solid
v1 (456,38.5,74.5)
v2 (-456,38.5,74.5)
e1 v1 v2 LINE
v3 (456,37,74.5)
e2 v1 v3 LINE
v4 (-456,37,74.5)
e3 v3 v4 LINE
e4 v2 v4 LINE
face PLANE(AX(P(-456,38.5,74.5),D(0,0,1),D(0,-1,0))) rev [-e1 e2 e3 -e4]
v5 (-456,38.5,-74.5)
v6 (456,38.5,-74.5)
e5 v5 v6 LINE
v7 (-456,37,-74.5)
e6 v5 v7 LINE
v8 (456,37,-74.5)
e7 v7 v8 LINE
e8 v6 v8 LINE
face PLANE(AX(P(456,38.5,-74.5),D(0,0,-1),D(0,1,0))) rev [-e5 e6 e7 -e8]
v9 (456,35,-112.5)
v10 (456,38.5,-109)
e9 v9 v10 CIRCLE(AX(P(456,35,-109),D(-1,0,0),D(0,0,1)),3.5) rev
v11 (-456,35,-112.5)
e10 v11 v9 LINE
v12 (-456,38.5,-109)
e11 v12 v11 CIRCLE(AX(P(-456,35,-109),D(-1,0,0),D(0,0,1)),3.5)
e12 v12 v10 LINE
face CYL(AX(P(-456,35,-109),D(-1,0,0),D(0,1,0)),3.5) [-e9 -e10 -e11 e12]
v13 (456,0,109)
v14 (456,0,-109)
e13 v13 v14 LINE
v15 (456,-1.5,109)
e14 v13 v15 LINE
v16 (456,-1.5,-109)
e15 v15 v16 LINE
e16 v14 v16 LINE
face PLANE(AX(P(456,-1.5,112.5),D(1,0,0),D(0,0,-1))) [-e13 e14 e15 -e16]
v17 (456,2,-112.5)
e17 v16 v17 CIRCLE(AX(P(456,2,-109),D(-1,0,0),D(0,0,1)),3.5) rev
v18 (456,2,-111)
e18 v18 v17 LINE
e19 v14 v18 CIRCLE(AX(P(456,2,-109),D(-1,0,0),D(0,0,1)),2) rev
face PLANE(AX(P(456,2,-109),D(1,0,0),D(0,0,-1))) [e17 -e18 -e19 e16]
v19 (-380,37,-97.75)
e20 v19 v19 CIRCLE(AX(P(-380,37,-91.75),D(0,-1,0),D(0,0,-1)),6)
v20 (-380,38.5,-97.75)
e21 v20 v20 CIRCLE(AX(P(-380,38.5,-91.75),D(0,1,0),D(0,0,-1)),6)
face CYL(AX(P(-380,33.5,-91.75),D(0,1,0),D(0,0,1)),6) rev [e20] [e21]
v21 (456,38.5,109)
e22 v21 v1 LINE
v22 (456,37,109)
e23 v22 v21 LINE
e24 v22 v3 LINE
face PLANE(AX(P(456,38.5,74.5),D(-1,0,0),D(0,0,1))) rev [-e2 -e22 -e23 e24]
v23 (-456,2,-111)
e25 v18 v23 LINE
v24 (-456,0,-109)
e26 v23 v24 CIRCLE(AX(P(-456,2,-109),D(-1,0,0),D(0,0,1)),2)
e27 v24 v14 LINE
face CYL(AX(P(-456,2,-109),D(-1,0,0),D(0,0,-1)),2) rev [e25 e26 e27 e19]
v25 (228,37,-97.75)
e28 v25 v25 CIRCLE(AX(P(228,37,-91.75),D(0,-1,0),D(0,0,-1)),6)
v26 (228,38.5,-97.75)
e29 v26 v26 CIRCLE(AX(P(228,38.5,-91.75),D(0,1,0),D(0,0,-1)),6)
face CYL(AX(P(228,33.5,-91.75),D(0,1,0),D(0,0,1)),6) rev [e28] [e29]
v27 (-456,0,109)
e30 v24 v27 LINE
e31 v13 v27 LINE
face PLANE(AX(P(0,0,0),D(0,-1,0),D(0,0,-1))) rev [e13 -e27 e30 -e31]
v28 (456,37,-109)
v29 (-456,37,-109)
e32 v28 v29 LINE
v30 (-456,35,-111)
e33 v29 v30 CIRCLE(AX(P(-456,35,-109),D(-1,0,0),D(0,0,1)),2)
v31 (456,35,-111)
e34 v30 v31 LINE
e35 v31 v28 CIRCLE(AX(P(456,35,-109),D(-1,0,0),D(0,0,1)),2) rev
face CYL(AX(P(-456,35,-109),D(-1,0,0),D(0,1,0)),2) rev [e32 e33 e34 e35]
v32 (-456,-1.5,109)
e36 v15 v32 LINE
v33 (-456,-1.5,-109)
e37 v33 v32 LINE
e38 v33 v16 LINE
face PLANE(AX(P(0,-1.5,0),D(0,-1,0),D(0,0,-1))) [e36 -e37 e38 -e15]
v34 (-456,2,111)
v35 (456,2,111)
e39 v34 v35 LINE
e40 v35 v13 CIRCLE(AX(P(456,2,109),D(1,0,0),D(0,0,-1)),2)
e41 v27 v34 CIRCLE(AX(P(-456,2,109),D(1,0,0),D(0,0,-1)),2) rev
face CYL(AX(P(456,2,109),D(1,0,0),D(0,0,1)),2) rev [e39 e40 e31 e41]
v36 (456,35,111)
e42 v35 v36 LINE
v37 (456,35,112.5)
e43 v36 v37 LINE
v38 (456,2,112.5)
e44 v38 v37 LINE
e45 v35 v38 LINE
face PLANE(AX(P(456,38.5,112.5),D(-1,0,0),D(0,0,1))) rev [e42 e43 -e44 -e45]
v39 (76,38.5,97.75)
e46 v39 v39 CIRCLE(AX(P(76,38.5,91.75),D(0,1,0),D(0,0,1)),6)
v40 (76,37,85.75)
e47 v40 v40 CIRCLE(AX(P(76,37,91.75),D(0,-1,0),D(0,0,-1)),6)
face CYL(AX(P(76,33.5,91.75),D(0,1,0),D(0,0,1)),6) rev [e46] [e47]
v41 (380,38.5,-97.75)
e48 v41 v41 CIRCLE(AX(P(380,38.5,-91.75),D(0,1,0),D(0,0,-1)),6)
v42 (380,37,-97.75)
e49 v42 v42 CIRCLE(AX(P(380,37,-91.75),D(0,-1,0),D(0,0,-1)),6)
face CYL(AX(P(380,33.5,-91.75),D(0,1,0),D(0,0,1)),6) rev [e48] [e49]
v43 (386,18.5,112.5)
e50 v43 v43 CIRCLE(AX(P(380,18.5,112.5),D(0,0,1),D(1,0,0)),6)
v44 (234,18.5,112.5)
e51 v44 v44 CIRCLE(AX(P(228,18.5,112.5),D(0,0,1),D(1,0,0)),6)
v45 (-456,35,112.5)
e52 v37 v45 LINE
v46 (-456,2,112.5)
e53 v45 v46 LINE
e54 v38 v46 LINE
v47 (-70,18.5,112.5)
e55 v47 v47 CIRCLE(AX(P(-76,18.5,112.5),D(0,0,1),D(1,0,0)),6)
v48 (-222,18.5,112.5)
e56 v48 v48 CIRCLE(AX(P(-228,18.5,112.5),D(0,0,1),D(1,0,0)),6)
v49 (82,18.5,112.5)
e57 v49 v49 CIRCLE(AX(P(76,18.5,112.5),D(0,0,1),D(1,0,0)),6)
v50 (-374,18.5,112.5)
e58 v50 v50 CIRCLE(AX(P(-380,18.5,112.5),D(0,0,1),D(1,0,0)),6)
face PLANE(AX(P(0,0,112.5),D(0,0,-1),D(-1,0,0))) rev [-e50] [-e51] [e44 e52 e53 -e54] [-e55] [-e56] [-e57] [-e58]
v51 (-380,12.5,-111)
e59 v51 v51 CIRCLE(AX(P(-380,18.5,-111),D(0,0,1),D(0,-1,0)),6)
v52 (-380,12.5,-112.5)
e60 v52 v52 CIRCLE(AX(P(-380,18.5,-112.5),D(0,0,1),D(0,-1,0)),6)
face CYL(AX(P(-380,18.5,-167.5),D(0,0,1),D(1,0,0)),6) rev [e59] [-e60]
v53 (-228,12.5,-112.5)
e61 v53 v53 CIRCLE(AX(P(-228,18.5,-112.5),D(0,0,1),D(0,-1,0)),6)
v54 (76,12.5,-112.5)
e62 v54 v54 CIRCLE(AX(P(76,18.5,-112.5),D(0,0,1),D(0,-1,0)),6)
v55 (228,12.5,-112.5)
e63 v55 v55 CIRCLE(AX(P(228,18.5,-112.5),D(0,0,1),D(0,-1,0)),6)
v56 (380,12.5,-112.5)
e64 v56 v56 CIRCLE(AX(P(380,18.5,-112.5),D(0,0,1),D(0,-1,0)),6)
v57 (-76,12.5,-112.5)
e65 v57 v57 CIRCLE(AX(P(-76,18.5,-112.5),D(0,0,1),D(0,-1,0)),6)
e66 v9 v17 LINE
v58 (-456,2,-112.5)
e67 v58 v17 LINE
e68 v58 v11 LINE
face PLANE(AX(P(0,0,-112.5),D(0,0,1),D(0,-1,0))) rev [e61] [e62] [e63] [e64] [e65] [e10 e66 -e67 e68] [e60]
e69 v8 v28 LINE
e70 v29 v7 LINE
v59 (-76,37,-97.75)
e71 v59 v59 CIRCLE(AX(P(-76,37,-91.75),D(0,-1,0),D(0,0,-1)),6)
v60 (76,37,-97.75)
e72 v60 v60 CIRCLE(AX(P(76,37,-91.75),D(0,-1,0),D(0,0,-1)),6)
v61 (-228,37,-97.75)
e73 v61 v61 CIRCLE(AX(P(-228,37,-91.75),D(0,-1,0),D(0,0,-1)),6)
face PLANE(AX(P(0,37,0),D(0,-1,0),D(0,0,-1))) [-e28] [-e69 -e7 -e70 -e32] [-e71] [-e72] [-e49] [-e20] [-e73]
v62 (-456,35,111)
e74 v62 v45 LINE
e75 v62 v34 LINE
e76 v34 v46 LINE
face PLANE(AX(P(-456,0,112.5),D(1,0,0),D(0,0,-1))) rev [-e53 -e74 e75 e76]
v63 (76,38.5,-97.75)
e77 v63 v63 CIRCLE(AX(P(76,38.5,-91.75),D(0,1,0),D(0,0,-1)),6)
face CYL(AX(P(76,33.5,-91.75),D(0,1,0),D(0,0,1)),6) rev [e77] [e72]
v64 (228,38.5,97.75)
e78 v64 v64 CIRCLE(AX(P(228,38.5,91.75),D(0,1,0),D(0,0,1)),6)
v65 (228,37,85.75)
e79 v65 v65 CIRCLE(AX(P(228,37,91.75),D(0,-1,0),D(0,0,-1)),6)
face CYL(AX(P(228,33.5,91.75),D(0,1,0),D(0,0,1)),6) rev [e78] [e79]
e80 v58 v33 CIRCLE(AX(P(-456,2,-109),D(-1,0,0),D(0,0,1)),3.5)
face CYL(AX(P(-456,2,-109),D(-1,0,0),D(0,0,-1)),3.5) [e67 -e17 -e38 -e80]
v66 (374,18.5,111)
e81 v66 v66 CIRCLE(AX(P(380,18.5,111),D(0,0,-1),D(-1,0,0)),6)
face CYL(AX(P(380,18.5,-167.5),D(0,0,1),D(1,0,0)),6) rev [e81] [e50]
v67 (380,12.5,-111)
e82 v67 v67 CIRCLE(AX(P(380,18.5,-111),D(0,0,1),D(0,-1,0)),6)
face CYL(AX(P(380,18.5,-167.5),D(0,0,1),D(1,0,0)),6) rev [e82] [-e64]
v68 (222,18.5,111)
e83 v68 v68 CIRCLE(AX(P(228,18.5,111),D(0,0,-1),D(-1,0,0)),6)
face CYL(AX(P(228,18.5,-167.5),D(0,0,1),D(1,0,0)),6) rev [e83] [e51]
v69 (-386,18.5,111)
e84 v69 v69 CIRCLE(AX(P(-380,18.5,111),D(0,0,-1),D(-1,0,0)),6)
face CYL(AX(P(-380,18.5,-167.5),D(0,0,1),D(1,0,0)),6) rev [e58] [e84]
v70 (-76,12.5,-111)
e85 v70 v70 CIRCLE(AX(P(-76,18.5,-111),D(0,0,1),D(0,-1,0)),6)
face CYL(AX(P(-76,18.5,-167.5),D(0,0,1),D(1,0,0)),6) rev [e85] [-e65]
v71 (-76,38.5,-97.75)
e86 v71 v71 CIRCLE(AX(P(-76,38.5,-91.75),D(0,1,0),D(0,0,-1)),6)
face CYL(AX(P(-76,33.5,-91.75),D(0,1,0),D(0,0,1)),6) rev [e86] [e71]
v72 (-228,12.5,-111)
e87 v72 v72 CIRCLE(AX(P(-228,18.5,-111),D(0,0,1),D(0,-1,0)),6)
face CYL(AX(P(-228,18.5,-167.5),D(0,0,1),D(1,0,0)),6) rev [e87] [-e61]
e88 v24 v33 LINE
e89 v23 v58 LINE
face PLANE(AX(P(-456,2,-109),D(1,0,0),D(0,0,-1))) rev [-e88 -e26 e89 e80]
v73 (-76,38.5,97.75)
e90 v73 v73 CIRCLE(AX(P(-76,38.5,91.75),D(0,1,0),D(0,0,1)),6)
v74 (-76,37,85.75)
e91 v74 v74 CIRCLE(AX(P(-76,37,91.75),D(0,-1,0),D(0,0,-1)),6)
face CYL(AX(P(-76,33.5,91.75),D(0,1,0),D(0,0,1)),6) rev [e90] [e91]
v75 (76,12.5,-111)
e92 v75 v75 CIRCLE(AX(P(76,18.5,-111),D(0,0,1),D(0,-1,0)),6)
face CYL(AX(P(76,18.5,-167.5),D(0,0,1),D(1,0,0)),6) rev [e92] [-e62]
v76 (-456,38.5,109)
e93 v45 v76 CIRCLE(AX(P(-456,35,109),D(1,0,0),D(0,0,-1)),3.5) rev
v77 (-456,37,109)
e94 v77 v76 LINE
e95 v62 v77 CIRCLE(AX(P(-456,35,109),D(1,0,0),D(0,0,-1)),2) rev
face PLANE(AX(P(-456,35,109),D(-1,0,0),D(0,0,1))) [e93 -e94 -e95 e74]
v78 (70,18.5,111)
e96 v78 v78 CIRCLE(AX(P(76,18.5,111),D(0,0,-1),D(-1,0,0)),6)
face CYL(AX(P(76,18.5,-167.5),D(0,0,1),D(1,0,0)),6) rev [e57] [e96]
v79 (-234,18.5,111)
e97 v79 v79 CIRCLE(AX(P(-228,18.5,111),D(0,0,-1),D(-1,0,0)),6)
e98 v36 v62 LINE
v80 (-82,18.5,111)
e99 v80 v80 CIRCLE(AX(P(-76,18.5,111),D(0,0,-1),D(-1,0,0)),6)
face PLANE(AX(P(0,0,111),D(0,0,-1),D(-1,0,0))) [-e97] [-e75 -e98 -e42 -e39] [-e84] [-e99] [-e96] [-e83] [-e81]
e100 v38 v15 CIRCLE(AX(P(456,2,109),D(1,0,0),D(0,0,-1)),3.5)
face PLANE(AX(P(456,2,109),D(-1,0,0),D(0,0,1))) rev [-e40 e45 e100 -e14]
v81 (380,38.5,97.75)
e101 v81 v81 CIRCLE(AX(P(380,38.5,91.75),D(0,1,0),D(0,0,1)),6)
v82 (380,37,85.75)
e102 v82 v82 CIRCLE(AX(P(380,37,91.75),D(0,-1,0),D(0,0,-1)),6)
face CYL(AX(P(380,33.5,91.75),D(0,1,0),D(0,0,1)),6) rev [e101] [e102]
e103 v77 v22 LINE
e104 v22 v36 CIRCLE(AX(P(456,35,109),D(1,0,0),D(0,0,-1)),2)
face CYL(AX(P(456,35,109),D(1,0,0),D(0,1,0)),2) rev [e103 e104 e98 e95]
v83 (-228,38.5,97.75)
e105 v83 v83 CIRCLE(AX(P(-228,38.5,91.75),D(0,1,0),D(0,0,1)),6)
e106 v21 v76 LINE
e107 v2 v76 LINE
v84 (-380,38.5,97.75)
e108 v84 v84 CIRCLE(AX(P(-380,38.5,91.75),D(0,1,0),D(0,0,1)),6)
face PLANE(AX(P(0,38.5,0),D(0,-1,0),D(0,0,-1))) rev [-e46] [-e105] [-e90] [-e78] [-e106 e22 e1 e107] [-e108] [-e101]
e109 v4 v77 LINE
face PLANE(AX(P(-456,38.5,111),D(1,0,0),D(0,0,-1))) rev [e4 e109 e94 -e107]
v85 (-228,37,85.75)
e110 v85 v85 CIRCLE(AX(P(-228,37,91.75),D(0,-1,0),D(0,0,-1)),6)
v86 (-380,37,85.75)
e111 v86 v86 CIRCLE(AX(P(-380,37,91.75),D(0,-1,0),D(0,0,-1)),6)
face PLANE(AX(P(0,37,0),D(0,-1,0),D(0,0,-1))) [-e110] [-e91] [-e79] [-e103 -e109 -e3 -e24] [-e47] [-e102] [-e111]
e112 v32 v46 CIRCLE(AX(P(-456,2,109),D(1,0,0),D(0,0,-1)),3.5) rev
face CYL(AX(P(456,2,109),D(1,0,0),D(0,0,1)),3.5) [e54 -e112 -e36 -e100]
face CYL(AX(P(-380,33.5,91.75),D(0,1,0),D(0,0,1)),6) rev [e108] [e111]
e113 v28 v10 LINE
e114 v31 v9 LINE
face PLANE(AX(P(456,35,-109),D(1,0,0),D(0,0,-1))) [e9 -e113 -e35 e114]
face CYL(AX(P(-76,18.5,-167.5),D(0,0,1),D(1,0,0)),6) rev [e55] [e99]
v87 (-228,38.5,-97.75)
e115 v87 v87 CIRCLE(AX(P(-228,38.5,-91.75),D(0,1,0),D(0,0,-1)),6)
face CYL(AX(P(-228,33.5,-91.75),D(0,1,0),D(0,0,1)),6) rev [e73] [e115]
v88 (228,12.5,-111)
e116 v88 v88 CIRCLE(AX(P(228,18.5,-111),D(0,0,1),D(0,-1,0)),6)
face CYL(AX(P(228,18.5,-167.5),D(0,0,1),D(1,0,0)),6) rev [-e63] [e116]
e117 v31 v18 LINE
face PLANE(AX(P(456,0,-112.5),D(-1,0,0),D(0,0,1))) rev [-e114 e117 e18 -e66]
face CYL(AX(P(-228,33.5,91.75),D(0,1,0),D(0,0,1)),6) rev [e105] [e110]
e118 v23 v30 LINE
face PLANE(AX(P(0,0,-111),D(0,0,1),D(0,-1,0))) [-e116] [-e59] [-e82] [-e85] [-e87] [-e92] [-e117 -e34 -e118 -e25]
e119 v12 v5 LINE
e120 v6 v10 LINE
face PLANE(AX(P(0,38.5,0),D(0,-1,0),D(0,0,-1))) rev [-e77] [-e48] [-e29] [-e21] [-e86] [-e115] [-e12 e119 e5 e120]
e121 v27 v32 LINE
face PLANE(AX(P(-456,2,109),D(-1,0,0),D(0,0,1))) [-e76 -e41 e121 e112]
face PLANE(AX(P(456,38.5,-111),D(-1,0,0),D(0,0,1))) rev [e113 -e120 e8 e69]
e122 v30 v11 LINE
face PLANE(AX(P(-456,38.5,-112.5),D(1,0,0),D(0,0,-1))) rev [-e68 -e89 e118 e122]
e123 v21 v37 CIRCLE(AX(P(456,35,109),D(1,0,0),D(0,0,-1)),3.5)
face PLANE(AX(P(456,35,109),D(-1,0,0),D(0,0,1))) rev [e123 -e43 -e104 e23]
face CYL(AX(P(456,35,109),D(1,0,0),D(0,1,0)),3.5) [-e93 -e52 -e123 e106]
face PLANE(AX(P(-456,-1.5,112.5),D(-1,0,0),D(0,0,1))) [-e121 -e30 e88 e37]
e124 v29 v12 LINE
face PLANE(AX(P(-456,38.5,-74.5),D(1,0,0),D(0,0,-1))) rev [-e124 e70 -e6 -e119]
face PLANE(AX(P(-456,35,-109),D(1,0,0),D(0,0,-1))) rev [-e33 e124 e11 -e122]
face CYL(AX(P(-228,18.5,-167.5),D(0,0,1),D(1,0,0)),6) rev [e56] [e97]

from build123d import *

# Parameters (mm, degrees)
SKETCH1_W                      = 912
SKETCH1_H                      = 225
BASE_FLANGE1_DEPTH             = 1.5
EDGE_FLANGE1_STRIP_W           = 10
EDGE_FLANGE1_STRIP_H           = 1.5
EDGE_FLANGE1_STRIP_CUT_DEPTH   = 912
EDGE_FLANGE1_STRIP_2_W         = 10
EDGE_FLANGE1_STRIP_2_H         = 1.5
EDGE_FLANGE1_STRIP_CUT_2_DEPTH = 912
EDGE_FLANGE1_DEPTH             = 912
EDGE_FLANGE1_BEND_DEPTH        = 912
EDGE_FLANGE2_STRIP_W           = 10
EDGE_FLANGE2_STRIP_H           = 1.5
EDGE_FLANGE2_STRIP_CUT_DEPTH   = 912
EDGE_FLANGE2_STRIP_2_W         = 10
EDGE_FLANGE2_STRIP_2_H         = 1.5
EDGE_FLANGE2_STRIP_CUT_2_DEPTH = 912
EDGE_FLANGE2_DEPTH             = 912
EDGE_FLANGE2_BEND_DEPTH        = 912
SKETCH18_R                     = 6
CUT_EXTRUDE1_DEPTH             = 280
SKETCH19_R                     = 6
CUT_EXTRUDE2_DEPTH             = 5


# Sheet-metal steps are written as plain solids
with BuildPart() as part:
    # Sketch1 → Base-Flange1 (new body)
    with BuildSketch(Plane(origin=(0, 0, 0), x_dir=(1, 0, 0), z_dir=(0, 1, 0))):
        Rectangle(SKETCH1_W, SKETCH1_H)
    extrude(amount=-BASE_FLANGE1_DEPTH)

    # Edge-Flange1 strip (across the edge) → Edge-Flange1 strip cut (cut)
    with BuildSketch(Plane(origin=(-456, 0, 112.5), x_dir=(0, 0, -1), z_dir=(1, 0, 0))):
        with Locations((-1.5, -0.75)):
            Rectangle(EDGE_FLANGE1_STRIP_W, EDGE_FLANGE1_STRIP_H)
    extrude(amount=EDGE_FLANGE1_STRIP_CUT_DEPTH, mode=Mode.SUBTRACT)

    # Edge-Flange1 strip 2 (across the edge) → Edge-Flange1 strip cut 2 (cut)
    with BuildSketch(Plane(origin=(456, 0, -112.5), x_dir=(0, 0, 1), z_dir=(-1, 0, 0))):
        with Locations((-1.5, -0.75)):
            Rectangle(EDGE_FLANGE1_STRIP_2_W, EDGE_FLANGE1_STRIP_2_H)
    extrude(amount=EDGE_FLANGE1_STRIP_CUT_2_DEPTH, mode=Mode.SUBTRACT)

    # Edge-Flange1 section (across the edge) → Edge-Flange1 (add)
    with BuildSketch(Plane(origin=(-456, 0, 112.5), x_dir=(0, 0, -1), z_dir=(1, 0, 0))):
        with BuildLine():
            Line((0, 2), (0, 38.5))
            Line((0, 38.5), (1.5, 38.5))
            Line((1.5, 38.5), (1.5, 2))
            ThreePointArc((1.5, 2), (2.085786438, 0.585786438), (3.5, 0))
            Line((3.5, 0), (3.5, -1.5))
            ThreePointArc((3.5, -1.5), (1.025126266, -0.474873734), (0, 2))
        make_face()
    extrude(amount=EDGE_FLANGE1_DEPTH)

    # Edge-Flange1 section 2 (across the edge) → Edge-Flange1 bend (add)
    with BuildSketch(Plane(origin=(456, 0, -112.5), x_dir=(0, 0, 1), z_dir=(-1, 0, 0))):
        with BuildLine():
            Line((0, 2), (0, 38.5))
            Line((0, 38.5), (1.5, 38.5))
            Line((1.5, 38.5), (1.5, 2))
            ThreePointArc((1.5, 2), (2.085786438, 0.585786438), (3.5, 0))
            Line((3.5, 0), (3.5, -1.5))
            ThreePointArc((3.5, -1.5), (1.025126266, -0.474873734), (0, 2))
        make_face()
    extrude(amount=EDGE_FLANGE1_BEND_DEPTH)

    # Edge-Flange2 strip (across the edge) → Edge-Flange2 strip cut (cut)
    with BuildSketch(Plane(origin=(-456, 38.5, 111), x_dir=(0, -1, 0), z_dir=(1, 0, 0))):
        with Locations((-1.5, -0.75)):
            Rectangle(EDGE_FLANGE2_STRIP_W, EDGE_FLANGE2_STRIP_H)
    extrude(amount=EDGE_FLANGE2_STRIP_CUT_DEPTH, mode=Mode.SUBTRACT)

    # Edge-Flange2 strip 2 (across the edge) → Edge-Flange2 strip cut 2 (cut)
    with BuildSketch(Plane(origin=(456, 38.5, -111), x_dir=(0, -1, 0), z_dir=(-1, 0, 0))):
        with Locations((-1.5, -0.75)):
            Rectangle(EDGE_FLANGE2_STRIP_2_W, EDGE_FLANGE2_STRIP_2_H)
    extrude(amount=EDGE_FLANGE2_STRIP_CUT_2_DEPTH, mode=Mode.SUBTRACT)

    # Edge-Flange2 section (across the edge) → Edge-Flange2 (add)
    with BuildSketch(Plane(origin=(-456, 38.5, 111), x_dir=(0, -1, 0), z_dir=(1, 0, 0))):
        with BuildLine():
            Line((0, 2), (0, 36.5))
            Line((0, 36.5), (1.5, 36.5))
            Line((1.5, 36.5), (1.5, 2))
            ThreePointArc((1.5, 2), (2.085786438, 0.585786438), (3.5, 0))
            Line((3.5, 0), (3.5, -1.5))
            ThreePointArc((3.5, -1.5), (1.025126266, -0.474873734), (0, 2))
        make_face()
    extrude(amount=EDGE_FLANGE2_DEPTH)

    # Edge-Flange2 section 2 (across the edge) → Edge-Flange2 bend (add)
    with BuildSketch(Plane(origin=(456, 38.5, -111), x_dir=(0, -1, 0), z_dir=(-1, 0, 0))):
        with BuildLine():
            Line((0, 2), (0, 36.5))
            Line((0, 36.5), (1.5, 36.5))
            Line((1.5, 36.5), (1.5, 2))
            ThreePointArc((1.5, 2), (2.085786438, 0.585786438), (3.5, 0))
            Line((3.5, 0), (3.5, -1.5))
            ThreePointArc((3.5, -1.5), (1.025126266, -0.474873734), (0, 2))
        make_face()
    extrude(amount=EDGE_FLANGE2_BEND_DEPTH)

    # Sketch18 → Cut-Extrude1 (cut)
    with BuildSketch(Plane.XY.offset(112.5)):
        with Locations((380, 18.5)):
            Circle(SKETCH18_R)
        with Locations((228, 18.5)):
            Circle(SKETCH18_R)
        with Locations((76, 18.5)):
            Circle(SKETCH18_R)
        with Locations((-76, 18.5)):
            Circle(SKETCH18_R)
        with Locations((-228, 18.5)):
            Circle(SKETCH18_R)
        with Locations((-380, 18.5)):
            Circle(SKETCH18_R)
    extrude(amount=-CUT_EXTRUDE1_DEPTH, mode=Mode.SUBTRACT)

    # Sketch19 → Cut-Extrude2 (cut)
    with BuildSketch(Plane(origin=(0, 38.5, 0), x_dir=(1, 0, 0), z_dir=(0, 1, 0))):
        with Locations(Location((-380, -91.75, 0), (0, 0, 270))):
            Circle(SKETCH19_R)
        with Locations(Location((-228, -91.75, 0), (0, 0, 270))):
            Circle(SKETCH19_R)
        with Locations(Location((-76, -91.75, 0), (0, 0, 270))):
            Circle(SKETCH19_R)
        with Locations(Location((76, -91.75, 0), (0, 0, 270))):
            Circle(SKETCH19_R)
        with Locations(Location((228, -91.75, 0), (0, 0, 270))):
            Circle(SKETCH19_R)
        with Locations(Location((380, -91.75, 0), (0, 0, 270))):
            Circle(SKETCH19_R)
        with Locations(Location((380, 91.75, 0), (0, 0, 90))):
            Circle(SKETCH19_R)
        with Locations(Location((228, 91.75, 0), (0, 0, 90))):
            Circle(SKETCH19_R)
        with Locations(Location((76, 91.75, 0), (0, 0, 90))):
            Circle(SKETCH19_R)
        with Locations(Location((-76, 91.75, 0), (0, 0, 90))):
            Circle(SKETCH19_R)
        with Locations(Location((-228, 91.75, 0), (0, 0, 90))):
            Circle(SKETCH19_R)
        with Locations(Location((-380, 91.75, 0), (0, 0, 90))):
            Circle(SKETCH19_R)
    extrude(amount=-CUT_EXTRUDE2_DEPTH, mode=Mode.SUBTRACT)


solid = part.part
